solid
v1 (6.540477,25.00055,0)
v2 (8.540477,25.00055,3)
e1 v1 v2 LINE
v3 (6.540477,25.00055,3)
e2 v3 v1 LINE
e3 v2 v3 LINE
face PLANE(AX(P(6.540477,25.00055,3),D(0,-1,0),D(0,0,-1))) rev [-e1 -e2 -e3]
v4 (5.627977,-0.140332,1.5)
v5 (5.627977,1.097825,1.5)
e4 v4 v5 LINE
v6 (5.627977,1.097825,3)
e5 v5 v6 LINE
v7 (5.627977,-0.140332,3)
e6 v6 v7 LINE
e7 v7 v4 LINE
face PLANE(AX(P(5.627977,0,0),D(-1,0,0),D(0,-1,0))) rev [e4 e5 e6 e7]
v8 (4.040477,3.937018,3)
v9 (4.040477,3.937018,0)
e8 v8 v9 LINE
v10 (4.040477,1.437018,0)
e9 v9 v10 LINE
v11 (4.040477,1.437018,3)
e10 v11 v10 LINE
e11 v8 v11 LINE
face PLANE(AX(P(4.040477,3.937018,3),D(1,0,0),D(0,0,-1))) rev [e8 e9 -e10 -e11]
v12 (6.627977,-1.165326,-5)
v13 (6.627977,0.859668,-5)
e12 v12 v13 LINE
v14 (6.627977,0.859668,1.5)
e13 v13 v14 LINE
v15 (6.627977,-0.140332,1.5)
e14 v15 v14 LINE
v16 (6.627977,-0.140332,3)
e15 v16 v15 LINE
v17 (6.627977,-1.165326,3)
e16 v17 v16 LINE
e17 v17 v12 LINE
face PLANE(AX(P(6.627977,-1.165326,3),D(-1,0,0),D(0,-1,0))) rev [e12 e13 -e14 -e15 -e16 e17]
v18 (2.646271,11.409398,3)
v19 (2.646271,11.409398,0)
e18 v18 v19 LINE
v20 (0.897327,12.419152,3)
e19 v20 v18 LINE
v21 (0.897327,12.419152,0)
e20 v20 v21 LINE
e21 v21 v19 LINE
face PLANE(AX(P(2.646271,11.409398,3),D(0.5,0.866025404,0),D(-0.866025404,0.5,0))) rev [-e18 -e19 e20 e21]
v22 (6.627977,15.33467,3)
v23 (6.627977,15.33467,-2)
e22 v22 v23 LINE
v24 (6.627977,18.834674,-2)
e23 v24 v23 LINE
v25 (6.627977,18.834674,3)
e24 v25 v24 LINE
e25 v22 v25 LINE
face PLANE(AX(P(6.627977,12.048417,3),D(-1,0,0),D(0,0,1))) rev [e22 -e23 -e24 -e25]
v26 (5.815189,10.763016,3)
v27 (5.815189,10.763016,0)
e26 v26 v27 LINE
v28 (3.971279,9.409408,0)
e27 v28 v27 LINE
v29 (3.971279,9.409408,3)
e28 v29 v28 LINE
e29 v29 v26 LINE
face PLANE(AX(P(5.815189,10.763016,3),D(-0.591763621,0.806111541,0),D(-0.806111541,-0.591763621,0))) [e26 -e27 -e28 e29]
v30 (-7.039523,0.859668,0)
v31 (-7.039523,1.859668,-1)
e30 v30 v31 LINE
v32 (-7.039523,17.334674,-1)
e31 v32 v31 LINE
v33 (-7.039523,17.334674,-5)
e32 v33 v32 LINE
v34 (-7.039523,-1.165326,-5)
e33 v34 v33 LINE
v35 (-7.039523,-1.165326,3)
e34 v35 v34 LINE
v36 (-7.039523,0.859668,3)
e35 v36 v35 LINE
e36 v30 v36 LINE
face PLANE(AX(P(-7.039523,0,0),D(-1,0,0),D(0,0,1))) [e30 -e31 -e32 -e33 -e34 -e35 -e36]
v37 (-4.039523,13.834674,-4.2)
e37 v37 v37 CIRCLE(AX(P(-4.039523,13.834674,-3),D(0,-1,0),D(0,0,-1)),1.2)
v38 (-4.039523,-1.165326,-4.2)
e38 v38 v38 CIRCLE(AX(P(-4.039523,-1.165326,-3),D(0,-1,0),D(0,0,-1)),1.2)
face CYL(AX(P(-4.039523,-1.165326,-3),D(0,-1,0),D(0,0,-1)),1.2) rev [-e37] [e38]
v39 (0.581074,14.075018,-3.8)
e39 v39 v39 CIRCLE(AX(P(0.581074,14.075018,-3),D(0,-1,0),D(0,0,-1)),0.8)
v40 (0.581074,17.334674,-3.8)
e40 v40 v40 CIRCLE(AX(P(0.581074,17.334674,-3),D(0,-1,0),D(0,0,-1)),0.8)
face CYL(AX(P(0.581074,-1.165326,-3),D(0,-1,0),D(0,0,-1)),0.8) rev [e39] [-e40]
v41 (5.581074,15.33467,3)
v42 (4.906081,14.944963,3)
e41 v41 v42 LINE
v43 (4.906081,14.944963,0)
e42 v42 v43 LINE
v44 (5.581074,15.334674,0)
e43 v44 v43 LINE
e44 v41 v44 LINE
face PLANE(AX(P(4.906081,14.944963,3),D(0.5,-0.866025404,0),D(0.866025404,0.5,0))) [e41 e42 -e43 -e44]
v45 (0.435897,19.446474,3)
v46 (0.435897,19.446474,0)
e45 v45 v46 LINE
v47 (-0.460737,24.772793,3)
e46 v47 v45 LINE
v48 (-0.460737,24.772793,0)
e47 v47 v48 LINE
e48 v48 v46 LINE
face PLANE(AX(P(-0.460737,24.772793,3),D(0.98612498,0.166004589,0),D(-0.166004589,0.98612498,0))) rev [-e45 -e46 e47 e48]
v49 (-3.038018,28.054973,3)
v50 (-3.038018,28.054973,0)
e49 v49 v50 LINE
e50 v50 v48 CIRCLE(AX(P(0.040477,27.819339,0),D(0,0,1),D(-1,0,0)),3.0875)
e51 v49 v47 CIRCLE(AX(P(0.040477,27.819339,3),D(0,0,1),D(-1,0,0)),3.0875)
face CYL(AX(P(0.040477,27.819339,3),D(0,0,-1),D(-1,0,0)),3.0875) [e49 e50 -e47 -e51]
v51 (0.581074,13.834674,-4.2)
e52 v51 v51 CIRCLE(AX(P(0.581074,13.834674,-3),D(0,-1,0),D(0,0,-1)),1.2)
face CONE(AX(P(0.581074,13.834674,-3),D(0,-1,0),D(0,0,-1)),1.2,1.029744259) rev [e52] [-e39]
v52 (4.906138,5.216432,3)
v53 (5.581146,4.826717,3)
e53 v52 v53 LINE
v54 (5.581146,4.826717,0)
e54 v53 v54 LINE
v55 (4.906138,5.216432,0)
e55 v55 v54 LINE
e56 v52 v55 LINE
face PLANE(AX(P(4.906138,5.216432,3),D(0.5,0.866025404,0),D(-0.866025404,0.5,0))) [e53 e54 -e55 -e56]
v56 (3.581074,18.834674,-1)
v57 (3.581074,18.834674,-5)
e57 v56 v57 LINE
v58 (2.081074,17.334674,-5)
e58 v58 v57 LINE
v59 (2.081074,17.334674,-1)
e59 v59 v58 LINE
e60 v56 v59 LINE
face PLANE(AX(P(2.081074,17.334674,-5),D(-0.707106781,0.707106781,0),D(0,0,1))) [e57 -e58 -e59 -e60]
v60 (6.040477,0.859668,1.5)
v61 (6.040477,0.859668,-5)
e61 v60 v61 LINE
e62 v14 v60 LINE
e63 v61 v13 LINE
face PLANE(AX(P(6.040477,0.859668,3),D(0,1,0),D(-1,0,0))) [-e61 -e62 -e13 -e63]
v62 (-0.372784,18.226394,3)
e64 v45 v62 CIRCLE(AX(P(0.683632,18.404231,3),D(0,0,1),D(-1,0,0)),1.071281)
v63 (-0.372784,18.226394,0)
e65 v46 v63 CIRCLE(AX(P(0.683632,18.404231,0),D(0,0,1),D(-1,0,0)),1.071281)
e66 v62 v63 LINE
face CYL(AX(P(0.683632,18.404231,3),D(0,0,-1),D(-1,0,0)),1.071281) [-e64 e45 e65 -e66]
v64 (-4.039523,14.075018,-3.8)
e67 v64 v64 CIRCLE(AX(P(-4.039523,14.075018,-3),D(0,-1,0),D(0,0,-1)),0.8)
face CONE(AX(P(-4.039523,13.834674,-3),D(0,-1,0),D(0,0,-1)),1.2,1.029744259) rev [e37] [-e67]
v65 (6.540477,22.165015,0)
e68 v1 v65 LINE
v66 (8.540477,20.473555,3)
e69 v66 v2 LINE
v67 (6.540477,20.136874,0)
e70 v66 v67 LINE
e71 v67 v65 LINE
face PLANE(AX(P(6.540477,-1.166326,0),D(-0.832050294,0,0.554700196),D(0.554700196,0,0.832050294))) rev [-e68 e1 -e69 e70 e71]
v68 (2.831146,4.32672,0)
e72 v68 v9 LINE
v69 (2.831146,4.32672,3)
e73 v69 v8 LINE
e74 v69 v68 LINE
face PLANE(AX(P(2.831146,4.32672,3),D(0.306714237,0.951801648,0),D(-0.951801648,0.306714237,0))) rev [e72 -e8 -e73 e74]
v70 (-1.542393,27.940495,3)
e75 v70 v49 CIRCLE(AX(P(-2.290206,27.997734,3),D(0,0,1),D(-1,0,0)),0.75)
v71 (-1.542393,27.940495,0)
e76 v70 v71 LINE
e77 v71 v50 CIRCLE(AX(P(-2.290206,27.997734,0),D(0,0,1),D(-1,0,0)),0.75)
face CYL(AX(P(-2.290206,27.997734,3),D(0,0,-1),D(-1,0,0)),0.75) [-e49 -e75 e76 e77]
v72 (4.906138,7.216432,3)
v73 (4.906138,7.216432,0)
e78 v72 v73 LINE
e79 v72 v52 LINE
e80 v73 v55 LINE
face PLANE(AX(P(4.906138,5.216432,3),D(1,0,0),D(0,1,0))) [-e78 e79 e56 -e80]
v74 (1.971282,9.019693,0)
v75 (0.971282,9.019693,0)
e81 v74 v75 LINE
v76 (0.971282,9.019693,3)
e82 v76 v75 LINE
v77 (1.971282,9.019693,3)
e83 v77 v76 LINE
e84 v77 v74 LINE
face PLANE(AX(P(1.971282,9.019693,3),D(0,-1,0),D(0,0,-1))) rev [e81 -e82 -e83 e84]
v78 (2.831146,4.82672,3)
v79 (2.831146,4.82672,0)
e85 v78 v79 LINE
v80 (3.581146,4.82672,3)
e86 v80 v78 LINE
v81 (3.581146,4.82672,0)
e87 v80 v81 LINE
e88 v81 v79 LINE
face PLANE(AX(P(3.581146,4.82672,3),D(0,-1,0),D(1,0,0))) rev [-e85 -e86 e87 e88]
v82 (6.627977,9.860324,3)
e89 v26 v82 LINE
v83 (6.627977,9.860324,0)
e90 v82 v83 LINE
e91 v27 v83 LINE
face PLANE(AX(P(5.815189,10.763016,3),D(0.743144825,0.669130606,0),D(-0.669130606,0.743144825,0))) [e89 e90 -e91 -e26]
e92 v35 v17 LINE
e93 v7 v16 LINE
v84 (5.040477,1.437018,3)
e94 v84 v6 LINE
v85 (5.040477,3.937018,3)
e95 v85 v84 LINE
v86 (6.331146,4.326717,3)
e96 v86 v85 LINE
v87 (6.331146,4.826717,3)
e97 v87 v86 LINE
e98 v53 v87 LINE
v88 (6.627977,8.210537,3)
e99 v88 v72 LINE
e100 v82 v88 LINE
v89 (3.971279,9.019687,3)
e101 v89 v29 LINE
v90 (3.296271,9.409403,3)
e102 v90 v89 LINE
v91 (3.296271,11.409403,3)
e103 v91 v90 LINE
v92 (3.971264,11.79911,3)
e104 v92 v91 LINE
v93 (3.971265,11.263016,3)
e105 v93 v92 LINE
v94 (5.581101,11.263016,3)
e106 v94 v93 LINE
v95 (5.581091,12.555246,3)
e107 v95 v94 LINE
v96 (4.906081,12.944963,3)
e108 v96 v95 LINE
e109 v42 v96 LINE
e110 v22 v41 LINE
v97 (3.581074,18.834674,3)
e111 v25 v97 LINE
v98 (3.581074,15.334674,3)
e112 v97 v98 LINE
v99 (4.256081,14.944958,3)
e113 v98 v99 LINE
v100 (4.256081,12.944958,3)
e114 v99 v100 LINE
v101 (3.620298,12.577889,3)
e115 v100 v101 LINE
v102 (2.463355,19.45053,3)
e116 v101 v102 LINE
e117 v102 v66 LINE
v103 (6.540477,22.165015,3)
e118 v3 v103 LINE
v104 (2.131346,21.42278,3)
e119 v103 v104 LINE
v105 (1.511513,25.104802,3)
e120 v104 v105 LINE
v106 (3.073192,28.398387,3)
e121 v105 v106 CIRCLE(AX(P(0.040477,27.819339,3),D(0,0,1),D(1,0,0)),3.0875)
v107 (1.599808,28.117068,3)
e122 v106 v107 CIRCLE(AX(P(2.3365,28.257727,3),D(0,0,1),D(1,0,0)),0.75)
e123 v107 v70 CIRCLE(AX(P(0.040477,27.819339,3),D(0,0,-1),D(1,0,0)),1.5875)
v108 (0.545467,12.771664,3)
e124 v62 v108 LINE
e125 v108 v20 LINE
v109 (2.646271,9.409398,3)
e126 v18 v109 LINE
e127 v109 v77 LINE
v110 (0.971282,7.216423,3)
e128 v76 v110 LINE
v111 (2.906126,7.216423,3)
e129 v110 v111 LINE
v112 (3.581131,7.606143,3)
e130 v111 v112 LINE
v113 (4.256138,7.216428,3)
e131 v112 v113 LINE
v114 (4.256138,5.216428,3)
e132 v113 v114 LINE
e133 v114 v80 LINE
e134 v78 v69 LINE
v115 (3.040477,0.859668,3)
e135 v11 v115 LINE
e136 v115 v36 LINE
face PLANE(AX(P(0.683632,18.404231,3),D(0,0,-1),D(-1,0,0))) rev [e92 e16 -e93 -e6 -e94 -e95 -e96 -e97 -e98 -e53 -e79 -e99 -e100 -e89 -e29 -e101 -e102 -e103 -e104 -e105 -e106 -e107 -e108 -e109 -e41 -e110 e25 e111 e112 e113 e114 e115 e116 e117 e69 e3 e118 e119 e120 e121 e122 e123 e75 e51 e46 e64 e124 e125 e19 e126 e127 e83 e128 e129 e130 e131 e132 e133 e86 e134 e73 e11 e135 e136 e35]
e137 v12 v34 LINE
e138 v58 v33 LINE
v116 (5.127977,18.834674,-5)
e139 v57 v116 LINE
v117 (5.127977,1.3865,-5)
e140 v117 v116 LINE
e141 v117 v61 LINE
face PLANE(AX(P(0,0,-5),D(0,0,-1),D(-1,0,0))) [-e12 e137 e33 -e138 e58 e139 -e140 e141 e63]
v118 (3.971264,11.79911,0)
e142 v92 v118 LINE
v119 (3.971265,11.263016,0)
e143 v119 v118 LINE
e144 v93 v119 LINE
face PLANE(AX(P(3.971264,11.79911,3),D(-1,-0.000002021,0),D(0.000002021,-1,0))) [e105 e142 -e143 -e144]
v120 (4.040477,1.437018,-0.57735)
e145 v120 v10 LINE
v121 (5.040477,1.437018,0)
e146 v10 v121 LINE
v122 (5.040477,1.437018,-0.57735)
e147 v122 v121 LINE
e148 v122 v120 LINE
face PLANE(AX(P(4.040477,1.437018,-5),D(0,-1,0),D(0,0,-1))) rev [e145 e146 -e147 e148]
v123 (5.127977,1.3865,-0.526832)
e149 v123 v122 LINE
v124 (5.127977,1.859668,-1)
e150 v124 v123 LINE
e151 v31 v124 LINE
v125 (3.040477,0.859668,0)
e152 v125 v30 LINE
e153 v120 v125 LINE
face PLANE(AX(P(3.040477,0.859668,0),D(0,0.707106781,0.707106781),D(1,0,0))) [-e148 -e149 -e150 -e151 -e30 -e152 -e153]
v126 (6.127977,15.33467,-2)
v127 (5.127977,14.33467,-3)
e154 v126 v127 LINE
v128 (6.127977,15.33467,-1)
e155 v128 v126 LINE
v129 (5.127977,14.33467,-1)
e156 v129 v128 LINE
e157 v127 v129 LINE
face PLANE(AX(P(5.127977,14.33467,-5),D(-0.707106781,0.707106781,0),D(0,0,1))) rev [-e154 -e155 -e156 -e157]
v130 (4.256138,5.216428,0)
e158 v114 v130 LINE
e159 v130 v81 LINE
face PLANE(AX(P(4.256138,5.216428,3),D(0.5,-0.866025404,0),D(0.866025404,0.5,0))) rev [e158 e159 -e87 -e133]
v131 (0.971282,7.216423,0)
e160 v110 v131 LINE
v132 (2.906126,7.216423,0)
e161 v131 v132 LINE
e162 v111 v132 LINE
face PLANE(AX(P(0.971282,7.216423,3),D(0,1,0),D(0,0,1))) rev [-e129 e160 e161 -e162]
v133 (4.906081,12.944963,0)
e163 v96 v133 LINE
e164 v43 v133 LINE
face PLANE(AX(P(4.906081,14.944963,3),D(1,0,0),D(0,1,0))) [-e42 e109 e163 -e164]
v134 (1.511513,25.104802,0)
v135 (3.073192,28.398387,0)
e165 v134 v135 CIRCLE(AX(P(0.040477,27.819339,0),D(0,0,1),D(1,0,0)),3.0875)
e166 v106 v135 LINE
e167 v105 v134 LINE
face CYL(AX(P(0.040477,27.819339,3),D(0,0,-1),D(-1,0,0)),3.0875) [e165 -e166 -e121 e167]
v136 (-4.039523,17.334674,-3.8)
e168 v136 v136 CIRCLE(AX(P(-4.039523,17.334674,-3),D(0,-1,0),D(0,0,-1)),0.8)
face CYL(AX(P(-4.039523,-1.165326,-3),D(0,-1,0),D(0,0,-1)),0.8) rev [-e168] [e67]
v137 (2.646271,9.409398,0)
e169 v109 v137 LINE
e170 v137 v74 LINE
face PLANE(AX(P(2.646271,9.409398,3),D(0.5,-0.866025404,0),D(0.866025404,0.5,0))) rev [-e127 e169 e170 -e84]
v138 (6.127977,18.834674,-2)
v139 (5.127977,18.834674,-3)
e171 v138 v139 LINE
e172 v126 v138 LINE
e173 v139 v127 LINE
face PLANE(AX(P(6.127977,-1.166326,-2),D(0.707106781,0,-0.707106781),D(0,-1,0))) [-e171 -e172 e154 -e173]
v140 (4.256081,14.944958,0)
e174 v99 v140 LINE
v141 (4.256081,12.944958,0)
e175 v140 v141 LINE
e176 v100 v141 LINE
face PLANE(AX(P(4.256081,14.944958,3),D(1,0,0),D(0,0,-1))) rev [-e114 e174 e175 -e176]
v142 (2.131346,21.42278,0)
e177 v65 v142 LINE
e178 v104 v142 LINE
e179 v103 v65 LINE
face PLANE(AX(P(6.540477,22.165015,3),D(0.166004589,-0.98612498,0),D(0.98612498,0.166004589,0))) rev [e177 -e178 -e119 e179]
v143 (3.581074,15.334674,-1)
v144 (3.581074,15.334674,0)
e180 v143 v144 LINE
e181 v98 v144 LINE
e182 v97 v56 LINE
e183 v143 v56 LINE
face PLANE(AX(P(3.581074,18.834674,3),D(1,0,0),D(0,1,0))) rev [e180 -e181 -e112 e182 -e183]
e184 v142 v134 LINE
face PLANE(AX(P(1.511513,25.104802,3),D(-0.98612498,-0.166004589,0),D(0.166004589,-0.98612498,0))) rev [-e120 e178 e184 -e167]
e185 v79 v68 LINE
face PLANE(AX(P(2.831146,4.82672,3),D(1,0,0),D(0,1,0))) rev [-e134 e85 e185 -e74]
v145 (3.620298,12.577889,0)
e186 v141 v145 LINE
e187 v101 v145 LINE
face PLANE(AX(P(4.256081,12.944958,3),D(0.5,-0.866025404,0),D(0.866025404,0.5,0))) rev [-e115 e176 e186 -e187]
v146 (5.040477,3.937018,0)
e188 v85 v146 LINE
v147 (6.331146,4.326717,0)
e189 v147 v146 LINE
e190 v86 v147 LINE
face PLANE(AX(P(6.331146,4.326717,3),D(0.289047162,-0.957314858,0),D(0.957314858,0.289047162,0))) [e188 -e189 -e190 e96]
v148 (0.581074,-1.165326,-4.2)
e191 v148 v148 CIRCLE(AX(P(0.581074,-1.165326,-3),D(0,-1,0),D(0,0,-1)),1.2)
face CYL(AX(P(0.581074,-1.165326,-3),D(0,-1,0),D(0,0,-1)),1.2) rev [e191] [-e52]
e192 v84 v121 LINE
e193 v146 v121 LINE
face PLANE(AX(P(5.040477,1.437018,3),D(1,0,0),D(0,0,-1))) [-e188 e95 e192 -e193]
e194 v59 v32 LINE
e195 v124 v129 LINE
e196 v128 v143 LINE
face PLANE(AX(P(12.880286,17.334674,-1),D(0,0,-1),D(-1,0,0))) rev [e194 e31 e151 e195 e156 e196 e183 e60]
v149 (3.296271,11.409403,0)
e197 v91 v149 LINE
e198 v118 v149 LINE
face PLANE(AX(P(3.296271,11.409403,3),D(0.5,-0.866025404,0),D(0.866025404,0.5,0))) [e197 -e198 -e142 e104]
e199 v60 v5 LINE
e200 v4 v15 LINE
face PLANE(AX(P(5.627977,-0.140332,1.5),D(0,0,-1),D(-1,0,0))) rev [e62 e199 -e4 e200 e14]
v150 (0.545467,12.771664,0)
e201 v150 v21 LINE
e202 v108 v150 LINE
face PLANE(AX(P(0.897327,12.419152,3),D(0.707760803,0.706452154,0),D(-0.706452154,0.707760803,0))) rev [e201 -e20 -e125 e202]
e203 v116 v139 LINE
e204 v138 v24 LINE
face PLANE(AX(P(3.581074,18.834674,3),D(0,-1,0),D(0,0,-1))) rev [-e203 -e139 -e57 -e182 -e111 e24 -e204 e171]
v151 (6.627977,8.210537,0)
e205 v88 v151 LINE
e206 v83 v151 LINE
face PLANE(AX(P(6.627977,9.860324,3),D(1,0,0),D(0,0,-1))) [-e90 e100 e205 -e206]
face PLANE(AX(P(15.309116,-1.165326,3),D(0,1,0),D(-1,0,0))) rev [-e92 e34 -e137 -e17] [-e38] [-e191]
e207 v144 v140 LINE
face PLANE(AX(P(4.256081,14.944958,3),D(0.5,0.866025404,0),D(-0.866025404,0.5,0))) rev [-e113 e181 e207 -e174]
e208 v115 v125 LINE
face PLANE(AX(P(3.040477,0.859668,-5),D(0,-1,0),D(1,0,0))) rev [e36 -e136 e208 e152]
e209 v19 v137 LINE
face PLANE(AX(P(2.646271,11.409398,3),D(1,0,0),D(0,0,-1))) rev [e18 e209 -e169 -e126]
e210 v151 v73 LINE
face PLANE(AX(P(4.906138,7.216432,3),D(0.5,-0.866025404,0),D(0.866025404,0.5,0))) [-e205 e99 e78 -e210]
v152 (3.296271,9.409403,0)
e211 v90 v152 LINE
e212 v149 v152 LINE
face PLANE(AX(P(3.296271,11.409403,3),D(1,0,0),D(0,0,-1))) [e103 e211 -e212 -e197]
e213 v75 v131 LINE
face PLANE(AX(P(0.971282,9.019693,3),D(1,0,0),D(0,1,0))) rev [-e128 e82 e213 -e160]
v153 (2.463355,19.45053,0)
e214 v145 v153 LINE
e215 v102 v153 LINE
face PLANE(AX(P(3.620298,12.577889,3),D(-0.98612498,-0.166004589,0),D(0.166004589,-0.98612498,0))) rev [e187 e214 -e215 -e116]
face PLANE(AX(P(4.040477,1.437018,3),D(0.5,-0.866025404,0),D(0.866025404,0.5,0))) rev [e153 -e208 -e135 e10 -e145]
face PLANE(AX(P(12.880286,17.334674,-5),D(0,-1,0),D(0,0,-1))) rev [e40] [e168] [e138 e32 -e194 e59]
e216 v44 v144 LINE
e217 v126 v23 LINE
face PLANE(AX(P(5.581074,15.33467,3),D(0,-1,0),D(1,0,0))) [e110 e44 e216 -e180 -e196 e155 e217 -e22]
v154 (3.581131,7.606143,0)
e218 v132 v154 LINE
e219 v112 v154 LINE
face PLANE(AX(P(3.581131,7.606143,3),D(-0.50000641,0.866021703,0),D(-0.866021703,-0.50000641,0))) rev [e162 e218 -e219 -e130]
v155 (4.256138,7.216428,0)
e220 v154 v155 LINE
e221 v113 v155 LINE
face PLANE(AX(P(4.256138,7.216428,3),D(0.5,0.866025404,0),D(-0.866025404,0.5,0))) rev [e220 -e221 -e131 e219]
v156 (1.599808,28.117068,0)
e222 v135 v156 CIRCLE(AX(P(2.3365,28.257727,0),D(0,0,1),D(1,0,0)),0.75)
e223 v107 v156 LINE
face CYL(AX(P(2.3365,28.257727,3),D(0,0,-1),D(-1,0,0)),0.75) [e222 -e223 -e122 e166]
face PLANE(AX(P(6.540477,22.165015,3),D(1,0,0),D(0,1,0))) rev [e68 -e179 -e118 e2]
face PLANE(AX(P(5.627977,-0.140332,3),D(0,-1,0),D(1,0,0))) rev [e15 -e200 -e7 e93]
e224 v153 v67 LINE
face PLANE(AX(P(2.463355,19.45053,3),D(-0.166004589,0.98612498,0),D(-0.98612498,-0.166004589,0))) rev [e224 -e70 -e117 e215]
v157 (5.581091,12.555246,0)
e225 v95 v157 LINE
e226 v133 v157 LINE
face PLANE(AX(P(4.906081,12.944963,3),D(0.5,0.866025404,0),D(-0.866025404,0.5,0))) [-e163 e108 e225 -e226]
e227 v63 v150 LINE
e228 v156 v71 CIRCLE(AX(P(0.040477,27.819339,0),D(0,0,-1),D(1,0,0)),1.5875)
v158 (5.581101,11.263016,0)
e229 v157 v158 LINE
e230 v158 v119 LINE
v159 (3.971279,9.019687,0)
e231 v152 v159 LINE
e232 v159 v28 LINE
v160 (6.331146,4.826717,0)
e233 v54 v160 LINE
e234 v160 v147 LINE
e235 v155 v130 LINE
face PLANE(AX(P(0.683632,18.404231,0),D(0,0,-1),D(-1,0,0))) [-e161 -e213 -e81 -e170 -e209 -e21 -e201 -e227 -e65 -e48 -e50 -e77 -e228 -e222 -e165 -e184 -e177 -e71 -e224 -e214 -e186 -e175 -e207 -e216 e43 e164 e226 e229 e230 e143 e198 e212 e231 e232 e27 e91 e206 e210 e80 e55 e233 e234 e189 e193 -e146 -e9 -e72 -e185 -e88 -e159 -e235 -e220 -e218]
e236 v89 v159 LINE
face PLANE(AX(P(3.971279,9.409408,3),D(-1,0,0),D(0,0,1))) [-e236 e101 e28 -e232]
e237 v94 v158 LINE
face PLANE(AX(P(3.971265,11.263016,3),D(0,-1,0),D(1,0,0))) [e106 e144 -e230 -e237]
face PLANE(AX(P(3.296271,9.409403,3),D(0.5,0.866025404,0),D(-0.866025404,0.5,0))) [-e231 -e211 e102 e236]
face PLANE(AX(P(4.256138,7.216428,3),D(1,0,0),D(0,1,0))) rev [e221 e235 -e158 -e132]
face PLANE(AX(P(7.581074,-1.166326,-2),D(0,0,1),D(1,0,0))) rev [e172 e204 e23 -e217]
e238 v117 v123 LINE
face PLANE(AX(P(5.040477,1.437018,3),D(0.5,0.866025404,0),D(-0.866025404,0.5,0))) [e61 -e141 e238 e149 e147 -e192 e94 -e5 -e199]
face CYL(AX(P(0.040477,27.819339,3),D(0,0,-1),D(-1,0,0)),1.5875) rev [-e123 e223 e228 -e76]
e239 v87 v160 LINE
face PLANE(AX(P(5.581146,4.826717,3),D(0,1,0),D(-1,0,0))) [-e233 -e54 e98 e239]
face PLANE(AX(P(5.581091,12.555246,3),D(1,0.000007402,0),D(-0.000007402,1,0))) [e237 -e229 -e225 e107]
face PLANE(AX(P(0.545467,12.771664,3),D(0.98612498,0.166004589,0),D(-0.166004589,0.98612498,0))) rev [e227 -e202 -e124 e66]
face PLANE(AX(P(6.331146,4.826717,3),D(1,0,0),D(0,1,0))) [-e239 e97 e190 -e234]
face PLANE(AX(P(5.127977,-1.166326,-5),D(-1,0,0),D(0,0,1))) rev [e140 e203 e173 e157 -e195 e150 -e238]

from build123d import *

# Parameters (mm, degrees)
BOSS_SWITCHMAIN_DEPTH                          = 3
SKETCH1_W                                      = 4
SKETCH1_H                                      = 3.5
BOSS_FLANGE_WIDTH_DEPTH                        = 5
BOSS_FLANGE_HEIGHT_REACH                       = 38.958
SKETCH2_W                                      = 4
SKETCH2_H                                      = 2
SKETCH2_W_2                                    = 8
SKETCH2_H_2                                    = 2.024994097
CUT_UP_TO_DOWN_DERAILLEUR_CLEARANCE_REACH      = 27.678
SKETCH10_W                                     = 2.453096586
SKETCH10_H                                     = 3
SKETCH17_W                                     = 12.1675
SKETCH17_H                                     = 4
BOSS_FLANGE_SUPPORT_DEPTH                      = 14.475002167
TAP_DRILL_FOR_M2X0_4_TAP1_D                    = 1.6
M2_CLEARANCE_HOLE2_D                           = 2.4
M2_CLEARANCE_HOLE2_DEPTH                       = 15
M2_CLEARANCE_HOLE2_TIP                         = 0.721032743
CUT_UP_TO_DOWN_CANTILEVER_SLOPE_REACH          = 32.725
CUT_DOWN_TO_UP_DERAILLEUR_CLEARANCE_DEPTH      = 34.178566414
CUT_DOWN_TO_UP_DERAILLEUR_CLEARANCE_DEPTH_BACK = 34.178566414
CHAMFER_FLANGE_SUPPORT_SIZE                    = 1.5
CHAMFER_FLANGE_SUPPORT_2_SIZE                  = 1
CHAMFER_FLANGE_SUPPORT_3_SIZE                  = 1
SKETCH18_W                                     = 1.5
SKETCH18_H                                     = 1.577350269
CUT_DOWN_TO_UP_DERAILLEUR_CLEARANCE_2_DEPTH    = 1


with BuildPart() as part:
    # Sketch-SwitchBossUp → Boss-SwitchMain (new body)
    with BuildSketch(Plane.XY):
        with BuildLine():
            Line((6.540476927, 22.165014537), (6.540476927, 25.000549624))
            Line((6.540476927, 25.000549624), (8.540476927, 25.000549624))
            Line((8.540476927, 25.000549624), (8.540476927, 20.473554675))
            Line((8.540476927, 20.473554675), (2.463355023, 19.450530066))
            Line((2.463355023, 19.450530066), (3.620297651, 12.577888564))
            Line((3.620297651, 12.577888564), (4.256080915, 12.944958203))
            Line((4.256080915, 12.944958203), (4.256080915, 14.944958203))
            Line((4.256080915, 14.944958203), (3.581073513, 15.334673908))
            Line((3.581073513, 15.334673908), (3.581073513, 18.834673908))
            Line((3.581073513, 18.834673908), (6.857327822, 18.834673908))
            Line((6.857327822, 18.834673908), (15.309115797, 18.834673908))
            Line((15.309115797, 18.834673908), (15.309115797, -1.165326092))
            Line((15.309115797, -1.165326092), (5.040476927, -1.165326092))
            Line((5.040476927, -1.165326092), (3.040476927, -1.165326092))
            Line((3.040476927, -1.165326092), (3.040476927, 0.859668005))
            Line((3.040476927, 0.859668005), (4.040476927, 1.437018274))
            Line((4.040476927, 1.437018274), (4.040476927, 3.937018274))
            Line((4.040476927, 3.937018274), (2.83114552, 4.326720436))
            Line((2.83114552, 4.326720436), (2.83114552, 4.826720436))
            Line((2.83114552, 4.826720436), (3.58114552, 4.826720436))
            Line((3.58114552, 4.826720436), (4.256138119, 5.216427595))
            Line((4.256138119, 5.216427595), (4.256138119, 7.216427595))
            Line((4.256138119, 7.216427595), (3.581130717, 7.6061433))
            Line((3.581130717, 7.6061433), (2.9061262, 7.216422599))
            Line((2.9061262, 7.216422599), (0.971281627, 7.216422599))
            Line((0.971281627, 7.216422599), (0.971281627, 9.019692757))
            Line((0.971281627, 9.019692757), (1.971281627, 9.019692757))
            Line((1.971281627, 9.019692757), (2.646271341, 9.40939825))
            Line((2.646271341, 9.40939825), (2.646271341, 11.40939825))
            Line((2.646271341, 11.40939825), (0.897326855, 12.41915182))
            Line((0.897326855, 12.41915182), (0.545466745, 12.771663724))
            Line((0.545466745, 12.771663724), (-0.372784255, 18.226393961))
            ThreePointArc((-0.372784255, 18.226393961), (-0.209313172, 18.996084896), (0.435897335, 19.446473985))
            Line((0.435897335, 19.446473985), (-0.46073685, 24.772792819))
            ThreePointArc((-0.46073685, 24.772792819), (-2.387846783, 25.912534906), (-3.038018253, 28.054973186))
            ThreePointArc((-3.038018253, 28.054973186), (-2.23296648, 28.745546602), (-1.542393064, 27.940494829))
            ThreePointArc((-1.542393064, 27.940494829), (0.129544452, 26.234339128), (1.59980805, 28.11706781))
            ThreePointArc((1.59980805, 28.11706781), (2.195840434, 28.994419163), (3.073191787, 28.398386779))
            ThreePointArc((3.073191787, 28.398386779), (2.830256228, 26.496543155), (1.511513111, 25.104801997))
            Line((1.511513111, 25.104801997), (2.131345845, 21.422780026))
            Line((2.131345845, 21.422780026), (6.540476927, 22.165014537))
        make_face()
        Polygon((5.581091201, 12.555245643), (5.581100766, 11.263016278), (3.971265023, 11.263016278), (3.97126394, 11.79911022), (3.296271341, 11.409403061), (3.296271341, 9.409403061), (3.971278743, 9.019687356), (3.971278743, 9.409408058), (5.815189335, 10.763016278), (6.627976927, 9.860324206), (6.627976927, 8.210536506), (5.581127833, 7.606137899), (4.906138119, 7.216432406), (4.906138119, 5.216432406), (5.58114552, 4.826716701), (6.33114552, 4.826716701), (6.33114552, 4.326716701), (5.040476927, 3.937018274), (5.040476927, 1.437018274), (6.040476927, 0.859668005), (9.127976927, 0.859668005), (10.437466736, 2.169157813), (10.437466736, 14.025180364), (9.127976927, 15.334670172), (5.581073513, 15.334670172), (4.906080915, 14.944963014), (4.906080915, 12.944963014), align=None, mode=Mode.SUBTRACT)
    extrude(amount=BOSS_SWITCHMAIN_DEPTH)

    # Sketch1 → Boss-Flange Width (add)
    with BuildSketch(Plane(origin=(0, 0, 0), x_dir=(-1, 0, 0), z_dir=(0, 0, -1))):
        Polygon((-7.581073513, -1.165326092), (0.412170615, -1.165326092), (0.412170615, 0.859668005), (-3.040476927, 0.859668005), (-4.040476927, 1.437018274), (-5.040476927, 1.437018274), (-6.040476927, 0.859668005), (-7.581073513, 0.859668005), align=None)
        with Locations((-5.581073513, 17.084673908)):
            Rectangle(SKETCH1_W, SKETCH1_H)
    extrude(amount=BOSS_FLANGE_WIDTH_DEPTH)

    # Sketch2 → Boss-Flange Height (add, up to next)
    with BuildSketch(Plane(origin=(-7.039523073, 0, 0), x_dir=(0, 0, -1), z_dir=(1, 0, 0)), mode=Mode.PRIVATE) as boss_flange_height_sk1:
        with Locations((3, 16.334673908)):
            Rectangle(SKETCH2_W, SKETCH2_H)
    boss_flange_height_tool1 = extrude(boss_flange_height_sk1.sketch, amount=BOSS_FLANGE_HEIGHT_REACH, mode=Mode.PRIVATE) - part.part
    # Sketch2 → Boss-Flange Height (add, up to next)
    with BuildSketch(Plane(origin=(-7.039523073, 0, 0), x_dir=(0, 0, -1), z_dir=(1, 0, 0)), mode=Mode.PRIVATE) as boss_flange_height_sk2:
        with Locations((1, -0.152829044)):
            Rectangle(SKETCH2_W_2, SKETCH2_H_2)
    boss_flange_height_tool2 = extrude(boss_flange_height_sk2.sketch, amount=BOSS_FLANGE_HEIGHT_REACH, mode=Mode.PRIVATE) - part.part
    add(boss_flange_height_tool1.solids().sort_by_distance((-7.039523, 16.334674, -3))[0])
    add(boss_flange_height_tool2.solids().sort_by_distance((-7.039523, -0.152829, -1))[0])

    # Sketch10 → Cut-Up-To-Down Derailleur Clearance (cut, up to next)
    with BuildSketch(Plane(origin=(0, 18.834673908, 0), x_dir=(1, 0, 0), z_dir=(0, 1, 0)), mode=Mode.PRIVATE) as cut_up_to_down_derailleur_clearance_sk1:
        with Locations((6.35452522, 3.5)):
            Rectangle(SKETCH10_W, SKETCH10_H)
    cut_up_to_down_derailleur_clearance_tool1 = extrude(cut_up_to_down_derailleur_clearance_sk1.sketch, amount=-CUT_UP_TO_DOWN_DERAILLEUR_CLEARANCE_REACH, mode=Mode.PRIVATE) & part.part
    add(cut_up_to_down_derailleur_clearance_tool1.solids().sort_by_distance((6.354525, 18.834674, -3.5))[0], mode=Mode.SUBTRACT)


with BuildPart() as boss_flange_support_tool:
    # Sketch17 → Boss-Flange Support (new body)
    with BuildSketch(Plane.XZ.offset(-15.334670172)):
        with Locations((-0.955773073, -3)):
            Rectangle(SKETCH17_W, SKETCH17_H)
    extrude(amount=BOSS_FLANGE_SUPPORT_DEPTH)


with BuildPart() as part_1:
    add(part.part)


with BuildPart() as part_2:
    # Boss-Flange Support: joined with boss_flange_support_tool
    add(part_1.part.fuse(boss_flange_support_tool.part, tol=0.00001))

    # Tap Drill for M2x0.4 Tap1 (through all)
    with Locations(Plane(origin=(0, -1.165326092, 0), x_dir=(-1, 0, 0), z_dir=(0, -1, 0))):
        with Locations((4.039523073, 3), (-0.581073513, 3)):
            Hole(TAP_DRILL_FOR_M2X0_4_TAP1_D / 2)

    # M2 Clearance Hole2
    with Locations(Plane.XZ.offset(1.165326092)):
        with Locations((-4.039523073, -3), (0.581073513, -3)):
            Hole(M2_CLEARANCE_HOLE2_D / 2, depth=M2_CLEARANCE_HOLE2_DEPTH)
            with Locations((0, 0, -(M2_CLEARANCE_HOLE2_DEPTH + M2_CLEARANCE_HOLE2_TIP / 2))):  # 118° drill point
                Cone(0, M2_CLEARANCE_HOLE2_D / 2, M2_CLEARANCE_HOLE2_TIP, mode=Mode.SUBTRACT)

    # Sketch12 → Cut-Up-to-Down Cantilever Slope (cut, up to next)
    with BuildSketch(Plane(origin=(0, 25.000549624, 0), x_dir=(1, 0, 0), z_dir=(0, 1, 0)), mode=Mode.PRIVATE) as cut_up_to_down_cantilever_slope_sk1:
        Polygon((6.540476927, 0), (8.540476927, -3), (8.540476927, 0), align=None)
    cut_up_to_down_cantilever_slope_tool1 = extrude(cut_up_to_down_cantilever_slope_sk1.sketch, amount=-CUT_UP_TO_DOWN_CANTILEVER_SLOPE_REACH, mode=Mode.PRIVATE) & part_2.part
    add(cut_up_to_down_cantilever_slope_tool1.solids().sort_by_distance((7.87381, 25.00055, 1))[0], mode=Mode.SUBTRACT)

    # Sketch16 → Cut-Down-to-Up Derailleur Clearance (cut, two sides: drawn at the far end of the back side and taken through both)
    with BuildSketch(Plane(origin=(0, 0, 0), x_dir=(-1, 0, 0), z_dir=(0, 0, -1)).offset(-CUT_DOWN_TO_UP_DERAILLEUR_CLEARANCE_DEPTH_BACK)):
        Polygon((-6.627976927, 18.834673908), (-15.309115797, 18.834673908), (-15.309115797, -1.165326092), (-6.627976927, -1.165326092), (-6.627976927, 5.203794929), (-8.003689255, 5.203794929), (-8.003689255, 12.048417413), (-6.627976927, 12.048417413), align=None)
    extrude(amount=CUT_DOWN_TO_UP_DERAILLEUR_CLEARANCE_DEPTH + CUT_DOWN_TO_UP_DERAILLEUR_CLEARANCE_DEPTH_BACK, mode=Mode.SUBTRACT)

    # Chamfer-Flange Support
    chamfer_flange_support_edges = [part_2.edges().sort_by_distance(p)[0] for p in [
        (3.581073513, 17.334673908, -3),
    ]]
    chamfer(chamfer_flange_support_edges, length=CHAMFER_FLANGE_SUPPORT_SIZE - 0.0001)  # a hair under: the kernel refuses the full size

    # Chamfer-Flange Support 2
    chamfer_flange_support_2_edges = [part_2.edges().sort_by_distance(p)[0] for p in [
        (5.127976927, 17.084673908, -2),
        (5.127976927, 15.334670172, -1.5),
    ]]
    chamfer(chamfer_flange_support_2_edges, length=CHAMFER_FLANGE_SUPPORT_2_SIZE)

    # Chamfer-Flange Support 3
    chamfer_flange_support_3_edges = [part_2.edges().sort_by_distance(p)[0] for p in [
        (-1.999523073, 0.859668005, -1),
    ]]
    chamfer(chamfer_flange_support_3_edges, length=CHAMFER_FLANGE_SUPPORT_3_SIZE)

    # Sketch18 → Cut-Down-to-Up Derailleur Clearance 2 (cut)
    with BuildSketch(Plane(origin=(6.627976927, 0, 0), x_dir=(0, 0, -1), z_dir=(1, 0, 0))):
        with Locations((-2.25, 0.64834314)):
            Rectangle(SKETCH18_W, SKETCH18_H)
    extrude(amount=-CUT_DOWN_TO_UP_DERAILLEUR_CLEARANCE_2_DEPTH, mode=Mode.SUBTRACT)


solid = part_2.part
